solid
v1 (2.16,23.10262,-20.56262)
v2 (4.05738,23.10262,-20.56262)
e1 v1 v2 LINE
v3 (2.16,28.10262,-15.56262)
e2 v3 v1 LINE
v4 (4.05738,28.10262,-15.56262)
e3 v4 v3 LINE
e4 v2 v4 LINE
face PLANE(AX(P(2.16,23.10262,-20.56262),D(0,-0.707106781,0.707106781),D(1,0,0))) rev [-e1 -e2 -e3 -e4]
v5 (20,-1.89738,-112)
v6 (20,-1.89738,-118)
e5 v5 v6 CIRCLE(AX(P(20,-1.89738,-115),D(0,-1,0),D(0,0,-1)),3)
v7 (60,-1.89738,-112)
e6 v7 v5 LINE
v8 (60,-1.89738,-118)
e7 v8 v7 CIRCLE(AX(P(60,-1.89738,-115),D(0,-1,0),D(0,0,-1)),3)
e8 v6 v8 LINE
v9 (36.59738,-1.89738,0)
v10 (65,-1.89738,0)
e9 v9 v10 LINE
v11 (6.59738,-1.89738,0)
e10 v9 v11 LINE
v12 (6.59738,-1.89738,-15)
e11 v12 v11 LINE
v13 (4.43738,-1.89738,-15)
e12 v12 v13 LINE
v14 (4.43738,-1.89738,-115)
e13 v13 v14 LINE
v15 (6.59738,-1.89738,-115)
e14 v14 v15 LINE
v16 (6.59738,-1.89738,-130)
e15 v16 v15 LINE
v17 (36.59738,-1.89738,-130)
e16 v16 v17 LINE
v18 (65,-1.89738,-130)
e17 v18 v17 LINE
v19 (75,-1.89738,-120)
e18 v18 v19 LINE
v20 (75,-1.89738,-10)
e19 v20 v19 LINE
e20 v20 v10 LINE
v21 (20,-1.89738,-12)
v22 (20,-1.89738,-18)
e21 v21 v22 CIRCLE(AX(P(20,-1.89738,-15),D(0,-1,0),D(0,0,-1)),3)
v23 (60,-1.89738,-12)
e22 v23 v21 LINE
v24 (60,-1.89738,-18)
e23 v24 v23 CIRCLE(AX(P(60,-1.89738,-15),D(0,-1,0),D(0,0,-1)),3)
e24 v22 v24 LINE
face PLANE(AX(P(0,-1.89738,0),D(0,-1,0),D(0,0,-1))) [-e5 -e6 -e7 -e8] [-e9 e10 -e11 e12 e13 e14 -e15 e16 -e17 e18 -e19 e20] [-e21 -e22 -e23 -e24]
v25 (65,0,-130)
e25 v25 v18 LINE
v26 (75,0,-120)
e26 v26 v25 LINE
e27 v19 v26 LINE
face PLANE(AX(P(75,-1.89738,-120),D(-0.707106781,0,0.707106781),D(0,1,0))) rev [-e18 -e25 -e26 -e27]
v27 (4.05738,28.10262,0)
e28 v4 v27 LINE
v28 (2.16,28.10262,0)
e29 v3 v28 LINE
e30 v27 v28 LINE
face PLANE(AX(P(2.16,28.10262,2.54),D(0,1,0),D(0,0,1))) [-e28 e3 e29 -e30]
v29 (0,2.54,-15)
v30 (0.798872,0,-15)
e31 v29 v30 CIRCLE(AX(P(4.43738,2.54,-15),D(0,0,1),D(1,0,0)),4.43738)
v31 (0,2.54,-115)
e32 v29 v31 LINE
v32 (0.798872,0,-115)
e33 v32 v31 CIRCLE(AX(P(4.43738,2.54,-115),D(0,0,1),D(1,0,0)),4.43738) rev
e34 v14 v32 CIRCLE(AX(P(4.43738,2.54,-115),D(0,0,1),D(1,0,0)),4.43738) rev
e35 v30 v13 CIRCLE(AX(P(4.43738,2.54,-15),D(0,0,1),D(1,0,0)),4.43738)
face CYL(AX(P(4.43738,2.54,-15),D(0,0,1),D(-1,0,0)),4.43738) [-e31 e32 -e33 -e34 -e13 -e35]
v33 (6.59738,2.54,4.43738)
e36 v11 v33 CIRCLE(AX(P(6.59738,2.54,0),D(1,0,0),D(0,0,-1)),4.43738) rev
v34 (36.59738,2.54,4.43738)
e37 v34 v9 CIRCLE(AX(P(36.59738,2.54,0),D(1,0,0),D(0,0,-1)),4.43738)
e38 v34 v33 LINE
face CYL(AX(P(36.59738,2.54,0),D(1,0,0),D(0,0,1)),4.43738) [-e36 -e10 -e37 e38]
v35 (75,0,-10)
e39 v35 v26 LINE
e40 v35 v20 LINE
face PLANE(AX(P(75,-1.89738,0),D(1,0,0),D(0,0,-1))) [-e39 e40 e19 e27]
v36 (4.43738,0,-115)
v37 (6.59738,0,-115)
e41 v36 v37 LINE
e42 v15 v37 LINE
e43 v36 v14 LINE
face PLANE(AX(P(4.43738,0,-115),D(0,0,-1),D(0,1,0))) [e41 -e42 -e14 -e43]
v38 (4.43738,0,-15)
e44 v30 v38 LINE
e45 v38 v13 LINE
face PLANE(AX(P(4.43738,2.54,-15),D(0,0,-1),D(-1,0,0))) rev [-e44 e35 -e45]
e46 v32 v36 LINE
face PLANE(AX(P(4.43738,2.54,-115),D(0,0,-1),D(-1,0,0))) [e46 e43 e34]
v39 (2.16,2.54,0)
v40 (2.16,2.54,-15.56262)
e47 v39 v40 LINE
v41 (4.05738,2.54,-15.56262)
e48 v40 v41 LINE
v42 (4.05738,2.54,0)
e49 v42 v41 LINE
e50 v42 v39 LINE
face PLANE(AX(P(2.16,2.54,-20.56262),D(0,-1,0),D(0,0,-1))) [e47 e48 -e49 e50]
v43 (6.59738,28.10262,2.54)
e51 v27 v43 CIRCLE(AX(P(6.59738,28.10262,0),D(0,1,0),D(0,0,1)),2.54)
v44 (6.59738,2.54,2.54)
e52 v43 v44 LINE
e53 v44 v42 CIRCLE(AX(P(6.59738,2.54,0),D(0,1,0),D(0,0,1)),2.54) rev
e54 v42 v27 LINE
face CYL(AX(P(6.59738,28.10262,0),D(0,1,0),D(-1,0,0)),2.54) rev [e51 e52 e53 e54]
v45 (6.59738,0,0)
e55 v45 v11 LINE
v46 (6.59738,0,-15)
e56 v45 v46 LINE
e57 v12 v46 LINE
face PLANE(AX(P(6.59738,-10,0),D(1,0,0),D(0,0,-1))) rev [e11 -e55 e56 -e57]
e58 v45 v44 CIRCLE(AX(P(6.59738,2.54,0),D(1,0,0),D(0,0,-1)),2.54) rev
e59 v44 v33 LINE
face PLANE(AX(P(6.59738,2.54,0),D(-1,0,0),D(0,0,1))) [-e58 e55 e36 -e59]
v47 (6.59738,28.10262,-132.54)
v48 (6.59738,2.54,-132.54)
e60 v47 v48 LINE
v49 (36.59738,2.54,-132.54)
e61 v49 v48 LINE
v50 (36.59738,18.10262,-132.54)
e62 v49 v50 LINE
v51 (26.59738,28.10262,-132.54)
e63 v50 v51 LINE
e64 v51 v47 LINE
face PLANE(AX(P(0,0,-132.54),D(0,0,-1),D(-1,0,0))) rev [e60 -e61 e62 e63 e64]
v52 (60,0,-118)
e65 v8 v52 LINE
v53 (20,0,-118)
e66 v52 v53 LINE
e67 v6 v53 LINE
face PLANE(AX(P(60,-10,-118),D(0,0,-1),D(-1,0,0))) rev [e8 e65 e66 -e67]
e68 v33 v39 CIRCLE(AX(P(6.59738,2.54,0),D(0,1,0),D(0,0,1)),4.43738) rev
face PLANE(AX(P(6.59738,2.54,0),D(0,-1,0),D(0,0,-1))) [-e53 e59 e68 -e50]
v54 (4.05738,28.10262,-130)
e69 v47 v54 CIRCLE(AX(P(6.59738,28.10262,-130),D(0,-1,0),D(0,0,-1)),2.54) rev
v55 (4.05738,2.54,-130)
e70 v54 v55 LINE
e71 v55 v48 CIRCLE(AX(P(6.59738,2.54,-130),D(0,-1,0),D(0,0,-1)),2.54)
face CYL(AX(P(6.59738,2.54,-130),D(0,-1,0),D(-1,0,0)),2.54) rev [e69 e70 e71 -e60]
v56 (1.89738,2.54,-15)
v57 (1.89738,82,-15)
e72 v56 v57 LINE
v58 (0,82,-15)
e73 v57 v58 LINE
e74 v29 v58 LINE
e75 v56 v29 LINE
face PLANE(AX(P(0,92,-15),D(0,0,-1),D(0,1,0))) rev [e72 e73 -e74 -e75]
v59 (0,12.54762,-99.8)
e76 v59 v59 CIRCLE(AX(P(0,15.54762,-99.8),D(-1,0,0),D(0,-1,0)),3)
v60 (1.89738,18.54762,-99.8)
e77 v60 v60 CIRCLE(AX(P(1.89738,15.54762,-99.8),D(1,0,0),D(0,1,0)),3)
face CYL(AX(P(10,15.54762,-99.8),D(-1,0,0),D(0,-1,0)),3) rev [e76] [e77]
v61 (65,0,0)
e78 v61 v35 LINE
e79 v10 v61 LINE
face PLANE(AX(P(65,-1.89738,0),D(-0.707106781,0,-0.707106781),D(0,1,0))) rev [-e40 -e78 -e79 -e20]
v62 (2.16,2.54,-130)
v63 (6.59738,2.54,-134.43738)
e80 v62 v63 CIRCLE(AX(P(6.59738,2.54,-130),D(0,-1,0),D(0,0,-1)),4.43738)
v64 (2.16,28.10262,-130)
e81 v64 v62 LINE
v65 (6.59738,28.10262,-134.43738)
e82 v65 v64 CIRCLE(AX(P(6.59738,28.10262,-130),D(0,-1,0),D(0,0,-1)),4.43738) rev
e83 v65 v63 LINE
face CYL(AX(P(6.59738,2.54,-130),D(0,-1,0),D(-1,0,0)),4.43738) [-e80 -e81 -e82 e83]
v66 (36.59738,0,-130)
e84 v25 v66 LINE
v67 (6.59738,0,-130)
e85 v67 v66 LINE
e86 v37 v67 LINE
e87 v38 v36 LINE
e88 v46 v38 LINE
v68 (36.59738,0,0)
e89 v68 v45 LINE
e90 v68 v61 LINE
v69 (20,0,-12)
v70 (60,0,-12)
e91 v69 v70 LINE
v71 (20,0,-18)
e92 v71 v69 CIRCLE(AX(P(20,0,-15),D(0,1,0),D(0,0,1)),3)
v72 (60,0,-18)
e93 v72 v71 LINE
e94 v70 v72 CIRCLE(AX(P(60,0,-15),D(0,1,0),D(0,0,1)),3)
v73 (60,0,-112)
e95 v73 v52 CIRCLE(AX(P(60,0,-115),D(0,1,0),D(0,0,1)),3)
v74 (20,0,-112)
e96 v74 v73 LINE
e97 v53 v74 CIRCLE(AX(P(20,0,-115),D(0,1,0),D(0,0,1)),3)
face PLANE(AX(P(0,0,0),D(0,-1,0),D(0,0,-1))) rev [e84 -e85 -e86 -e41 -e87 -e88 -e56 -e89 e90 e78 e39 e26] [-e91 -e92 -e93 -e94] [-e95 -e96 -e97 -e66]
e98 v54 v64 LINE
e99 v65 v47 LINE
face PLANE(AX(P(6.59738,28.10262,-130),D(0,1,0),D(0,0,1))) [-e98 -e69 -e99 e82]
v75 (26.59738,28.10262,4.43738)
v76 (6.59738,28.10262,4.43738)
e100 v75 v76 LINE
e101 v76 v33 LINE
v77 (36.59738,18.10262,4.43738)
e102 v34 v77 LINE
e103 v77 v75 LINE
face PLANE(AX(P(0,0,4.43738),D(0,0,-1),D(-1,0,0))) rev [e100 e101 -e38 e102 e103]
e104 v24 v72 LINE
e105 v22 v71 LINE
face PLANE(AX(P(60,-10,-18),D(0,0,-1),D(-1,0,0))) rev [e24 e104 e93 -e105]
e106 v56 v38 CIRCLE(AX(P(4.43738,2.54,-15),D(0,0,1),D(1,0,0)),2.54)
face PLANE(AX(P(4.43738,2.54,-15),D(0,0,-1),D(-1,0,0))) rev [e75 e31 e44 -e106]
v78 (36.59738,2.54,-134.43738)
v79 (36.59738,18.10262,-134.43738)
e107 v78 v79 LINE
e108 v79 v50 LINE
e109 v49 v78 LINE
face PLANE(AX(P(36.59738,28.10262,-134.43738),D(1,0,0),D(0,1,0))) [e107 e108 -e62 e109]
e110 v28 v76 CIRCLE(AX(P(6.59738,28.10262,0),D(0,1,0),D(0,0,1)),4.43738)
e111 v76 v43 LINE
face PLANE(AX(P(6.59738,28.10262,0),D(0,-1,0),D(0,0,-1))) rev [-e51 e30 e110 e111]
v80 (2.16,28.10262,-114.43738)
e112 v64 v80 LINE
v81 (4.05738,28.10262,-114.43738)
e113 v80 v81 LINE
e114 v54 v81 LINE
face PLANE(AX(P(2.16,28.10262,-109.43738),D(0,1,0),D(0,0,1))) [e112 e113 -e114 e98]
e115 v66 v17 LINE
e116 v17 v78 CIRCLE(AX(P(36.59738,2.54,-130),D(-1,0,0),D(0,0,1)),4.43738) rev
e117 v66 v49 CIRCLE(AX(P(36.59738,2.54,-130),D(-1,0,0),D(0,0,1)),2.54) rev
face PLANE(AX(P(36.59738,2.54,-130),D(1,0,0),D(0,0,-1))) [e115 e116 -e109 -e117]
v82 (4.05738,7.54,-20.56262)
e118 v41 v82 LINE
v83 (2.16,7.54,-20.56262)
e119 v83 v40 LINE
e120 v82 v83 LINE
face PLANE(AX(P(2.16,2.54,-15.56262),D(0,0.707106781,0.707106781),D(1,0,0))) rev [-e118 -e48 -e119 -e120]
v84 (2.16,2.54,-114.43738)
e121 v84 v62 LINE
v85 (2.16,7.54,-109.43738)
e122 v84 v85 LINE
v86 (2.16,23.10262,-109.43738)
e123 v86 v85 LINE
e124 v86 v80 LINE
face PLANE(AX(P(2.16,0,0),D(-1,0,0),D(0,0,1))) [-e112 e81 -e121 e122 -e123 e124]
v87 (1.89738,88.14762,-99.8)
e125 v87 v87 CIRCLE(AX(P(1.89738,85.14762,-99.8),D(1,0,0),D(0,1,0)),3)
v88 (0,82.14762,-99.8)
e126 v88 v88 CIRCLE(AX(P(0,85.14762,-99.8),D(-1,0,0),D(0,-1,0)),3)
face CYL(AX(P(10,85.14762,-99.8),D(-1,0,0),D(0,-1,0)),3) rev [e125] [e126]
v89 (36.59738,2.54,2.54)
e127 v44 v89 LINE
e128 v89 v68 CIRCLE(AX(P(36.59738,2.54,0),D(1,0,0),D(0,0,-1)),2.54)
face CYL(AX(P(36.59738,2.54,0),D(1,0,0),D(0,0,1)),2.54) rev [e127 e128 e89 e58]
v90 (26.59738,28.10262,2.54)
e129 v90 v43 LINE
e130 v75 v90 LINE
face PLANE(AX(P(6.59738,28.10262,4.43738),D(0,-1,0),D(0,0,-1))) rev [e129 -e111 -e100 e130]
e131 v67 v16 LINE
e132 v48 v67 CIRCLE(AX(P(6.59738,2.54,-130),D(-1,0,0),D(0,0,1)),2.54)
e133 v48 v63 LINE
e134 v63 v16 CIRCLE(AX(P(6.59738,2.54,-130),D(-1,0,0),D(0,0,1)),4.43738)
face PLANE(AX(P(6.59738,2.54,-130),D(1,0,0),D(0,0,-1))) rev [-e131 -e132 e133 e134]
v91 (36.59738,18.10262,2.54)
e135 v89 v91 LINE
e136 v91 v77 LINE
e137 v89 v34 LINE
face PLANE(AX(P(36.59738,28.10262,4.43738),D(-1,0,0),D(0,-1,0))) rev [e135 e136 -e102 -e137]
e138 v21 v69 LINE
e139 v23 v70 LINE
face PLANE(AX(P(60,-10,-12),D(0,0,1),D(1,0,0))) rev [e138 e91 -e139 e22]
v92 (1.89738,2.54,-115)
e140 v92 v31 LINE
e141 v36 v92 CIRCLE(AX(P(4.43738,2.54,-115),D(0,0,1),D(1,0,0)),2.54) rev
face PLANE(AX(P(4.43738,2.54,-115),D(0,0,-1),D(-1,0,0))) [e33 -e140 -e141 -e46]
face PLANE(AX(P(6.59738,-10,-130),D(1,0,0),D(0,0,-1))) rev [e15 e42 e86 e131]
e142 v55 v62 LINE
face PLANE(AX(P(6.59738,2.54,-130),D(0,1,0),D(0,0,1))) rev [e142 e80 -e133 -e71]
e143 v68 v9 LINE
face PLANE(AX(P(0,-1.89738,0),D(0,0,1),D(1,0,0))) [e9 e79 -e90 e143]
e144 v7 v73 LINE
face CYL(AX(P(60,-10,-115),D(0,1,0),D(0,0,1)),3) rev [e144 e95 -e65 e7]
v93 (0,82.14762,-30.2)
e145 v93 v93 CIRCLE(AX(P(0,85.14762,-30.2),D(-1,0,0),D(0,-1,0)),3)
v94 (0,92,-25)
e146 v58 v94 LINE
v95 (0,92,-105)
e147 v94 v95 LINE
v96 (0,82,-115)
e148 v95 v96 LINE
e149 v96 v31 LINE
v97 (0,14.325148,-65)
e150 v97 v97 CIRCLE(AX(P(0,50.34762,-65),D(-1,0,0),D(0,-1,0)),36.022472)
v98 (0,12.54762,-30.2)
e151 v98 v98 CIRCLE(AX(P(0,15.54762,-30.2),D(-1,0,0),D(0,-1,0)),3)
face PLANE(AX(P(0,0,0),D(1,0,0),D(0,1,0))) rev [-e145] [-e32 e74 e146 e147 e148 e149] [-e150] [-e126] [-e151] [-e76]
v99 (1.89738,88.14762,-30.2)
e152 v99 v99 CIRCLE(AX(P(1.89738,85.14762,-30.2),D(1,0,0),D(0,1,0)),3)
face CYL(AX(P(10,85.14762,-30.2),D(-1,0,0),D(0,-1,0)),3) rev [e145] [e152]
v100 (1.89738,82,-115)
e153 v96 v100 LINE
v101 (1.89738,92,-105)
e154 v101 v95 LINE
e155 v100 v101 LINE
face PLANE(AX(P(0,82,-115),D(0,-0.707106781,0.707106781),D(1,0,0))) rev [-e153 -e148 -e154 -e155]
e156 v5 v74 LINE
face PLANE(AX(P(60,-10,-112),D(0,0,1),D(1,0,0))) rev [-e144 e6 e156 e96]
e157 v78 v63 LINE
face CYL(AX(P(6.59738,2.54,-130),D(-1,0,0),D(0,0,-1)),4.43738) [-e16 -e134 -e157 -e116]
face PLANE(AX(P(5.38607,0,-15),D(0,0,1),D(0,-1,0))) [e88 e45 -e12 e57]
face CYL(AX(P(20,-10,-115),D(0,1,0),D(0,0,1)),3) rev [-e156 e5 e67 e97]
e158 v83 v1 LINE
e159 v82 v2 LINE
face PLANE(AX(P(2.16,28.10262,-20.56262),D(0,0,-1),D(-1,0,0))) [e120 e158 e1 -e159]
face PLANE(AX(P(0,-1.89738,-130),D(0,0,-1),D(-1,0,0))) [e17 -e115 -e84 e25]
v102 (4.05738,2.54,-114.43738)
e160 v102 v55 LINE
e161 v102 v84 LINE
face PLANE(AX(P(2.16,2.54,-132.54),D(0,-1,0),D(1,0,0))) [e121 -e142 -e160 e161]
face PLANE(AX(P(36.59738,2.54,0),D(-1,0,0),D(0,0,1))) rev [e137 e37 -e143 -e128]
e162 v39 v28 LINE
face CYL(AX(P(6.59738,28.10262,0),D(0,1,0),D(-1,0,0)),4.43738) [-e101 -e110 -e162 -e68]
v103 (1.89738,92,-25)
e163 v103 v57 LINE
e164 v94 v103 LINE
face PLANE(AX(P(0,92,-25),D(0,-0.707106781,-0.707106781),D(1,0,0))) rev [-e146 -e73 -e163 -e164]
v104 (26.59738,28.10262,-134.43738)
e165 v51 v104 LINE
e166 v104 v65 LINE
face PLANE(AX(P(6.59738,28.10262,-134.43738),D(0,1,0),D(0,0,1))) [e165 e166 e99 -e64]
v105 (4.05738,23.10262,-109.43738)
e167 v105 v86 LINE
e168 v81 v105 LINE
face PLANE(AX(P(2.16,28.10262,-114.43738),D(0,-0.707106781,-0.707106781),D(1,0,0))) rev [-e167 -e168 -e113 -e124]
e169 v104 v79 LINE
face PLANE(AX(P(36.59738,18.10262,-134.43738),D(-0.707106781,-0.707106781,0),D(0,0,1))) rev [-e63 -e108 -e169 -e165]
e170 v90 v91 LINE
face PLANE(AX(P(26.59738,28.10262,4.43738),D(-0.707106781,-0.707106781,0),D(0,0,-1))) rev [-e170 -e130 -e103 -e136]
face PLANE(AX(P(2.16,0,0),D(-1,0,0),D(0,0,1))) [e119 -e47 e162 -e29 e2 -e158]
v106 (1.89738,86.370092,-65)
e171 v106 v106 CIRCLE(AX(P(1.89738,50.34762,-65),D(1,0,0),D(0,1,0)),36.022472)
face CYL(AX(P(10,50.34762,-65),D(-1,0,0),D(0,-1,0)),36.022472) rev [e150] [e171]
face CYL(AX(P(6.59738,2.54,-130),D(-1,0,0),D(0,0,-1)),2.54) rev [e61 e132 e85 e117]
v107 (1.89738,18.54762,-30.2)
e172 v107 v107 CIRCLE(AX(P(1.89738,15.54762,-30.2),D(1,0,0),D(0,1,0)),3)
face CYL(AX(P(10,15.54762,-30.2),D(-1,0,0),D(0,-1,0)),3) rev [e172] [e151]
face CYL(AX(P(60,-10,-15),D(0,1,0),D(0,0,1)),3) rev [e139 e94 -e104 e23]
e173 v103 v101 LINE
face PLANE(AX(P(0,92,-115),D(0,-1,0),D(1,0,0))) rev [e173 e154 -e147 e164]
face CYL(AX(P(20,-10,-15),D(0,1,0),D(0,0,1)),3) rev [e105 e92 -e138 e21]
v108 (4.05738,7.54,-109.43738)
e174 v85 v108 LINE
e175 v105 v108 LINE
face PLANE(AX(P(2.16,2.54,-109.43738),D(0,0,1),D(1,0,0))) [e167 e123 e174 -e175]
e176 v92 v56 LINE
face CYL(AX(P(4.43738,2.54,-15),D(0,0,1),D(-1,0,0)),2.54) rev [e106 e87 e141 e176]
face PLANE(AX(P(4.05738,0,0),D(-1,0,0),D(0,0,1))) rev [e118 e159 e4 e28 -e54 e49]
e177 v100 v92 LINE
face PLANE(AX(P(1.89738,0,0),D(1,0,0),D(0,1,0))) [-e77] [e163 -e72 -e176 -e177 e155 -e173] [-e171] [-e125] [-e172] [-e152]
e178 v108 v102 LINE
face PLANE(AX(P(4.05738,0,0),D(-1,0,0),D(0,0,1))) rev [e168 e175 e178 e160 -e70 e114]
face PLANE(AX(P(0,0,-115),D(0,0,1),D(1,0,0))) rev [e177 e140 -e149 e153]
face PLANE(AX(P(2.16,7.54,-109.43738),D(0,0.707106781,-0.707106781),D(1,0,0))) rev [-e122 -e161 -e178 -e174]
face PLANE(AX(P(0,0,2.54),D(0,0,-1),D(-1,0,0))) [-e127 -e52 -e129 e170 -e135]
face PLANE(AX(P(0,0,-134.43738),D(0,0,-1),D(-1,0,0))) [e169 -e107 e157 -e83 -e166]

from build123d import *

# Parameters (mm, degrees)
SKETCH1_W                     = 75
SKETCH1_H                     = 130
BASE_FLANGE1_DEPTH            = 1.89738
EDGE_FLANGE1_STRIP_W          = 12.66952
EDGE_FLANGE1_STRIP_H          = 1.89738
EDGE_FLANGE1_STRIP_CUT_DEPTH  = 100
EDGE_FLANGE1_RELIEF_W         = 13.61821
EDGE_FLANGE1_RELIEF_H         = 0.94869
EDGE_FLANGE1_RELIEF_CUT_DEPTH = 1.89738
EDGE_FLANGE1_DEPTH            = 100
SKETCH18_R                    = 3
SKETCH18_R_2                  = 36.022471604
CUT_EXTRUDE1_DEPTH            = 10
BREAK_CORNER1_DEPTH           = 1.89738
BREAK_CORNER2_START           = -1.89738
BREAK_CORNER2_DEPTH           = 1.89738
CUT_EXTRUDE2_DEPTH            = 10
EDGE_FLANGE2_DEPTH            = 30
EDGE_FLANGE3_DEPTH            = 25.56262
EDGE_FLANGE4_DEPTH            = 30
EDGE_FLANGE5_DEPTH            = 25.56262
BREAK_CORNER3_START           = 38.678740931
BREAK_CORNER3_OUTLINE_W       = 18
BREAK_CORNER3_OUTLINE_H       = 1.89738
BREAK_CORNER3_DEPTH           = 7.071067812
BREAK_CORNER4_START           = 2.16
BREAK_CORNER4_DEPTH           = 1.89738
SKETCH32_W                    = 6.59738
SKETCH32_H                    = 15
CUT_EXTRUDE3_DEPTH            = 10


# Read off the part's stored shape, not the designer's step: Break-Corner1, Break-Corner2, Break-Corner3, Break-Corner4
# Sheet-metal steps are written as plain solids
with BuildPart() as part:
    # Sketch1 → Base-Flange1 (new body)
    with BuildSketch(Plane(origin=(0, 0, 0), x_dir=(1, 0, 0), z_dir=(0, 1, 0))):
        with Locations((37.5, 65)):
            Rectangle(SKETCH1_W, SKETCH1_H)
    extrude(amount=-BASE_FLANGE1_DEPTH)

    # Edge-Flange1 strip (across the edge) → Edge-Flange1 strip cut (cut)
    with BuildSketch(Plane.XY.offset(-115)):
        with Locations((-1.89738, -0.94869)):
            Rectangle(EDGE_FLANGE1_STRIP_W, EDGE_FLANGE1_STRIP_H)
    extrude(amount=EDGE_FLANGE1_STRIP_CUT_DEPTH, mode=Mode.SUBTRACT)

    # Edge-Flange1 relief (on the sheet) → Edge-Flange1 relief cut (cut)
    with BuildSketch(Plane(origin=(4.43738, 0, -115), x_dir=(1, 0, 0), z_dir=(0, 1, 0))):
        with Locations((-5.860415, 0.474345)):
            Rectangle(EDGE_FLANGE1_RELIEF_W, EDGE_FLANGE1_RELIEF_H)
        with Locations((-5.860415, -100.474345)):
            Rectangle(EDGE_FLANGE1_RELIEF_W, EDGE_FLANGE1_RELIEF_H)
    extrude(amount=-EDGE_FLANGE1_RELIEF_CUT_DEPTH, mode=Mode.SUBTRACT)

    # Edge-Flange1 section (across the edge) → Edge-Flange1 (add)
    with BuildSketch(Plane.XY.offset(-115)):
        with BuildLine():
            Line((0, 2.54), (0, 92))
            Line((0, 92), (1.89738, 92))
            Line((1.89738, 92), (1.89738, 2.54))
            ThreePointArc((1.89738, 2.54), (2.641328776, 0.743948776), (4.43738, 0))
            Line((4.43738, 0), (4.43738, -1.89738))
            ThreePointArc((4.43738, -1.89738), (1.299678511, -0.597701489), (0, 2.54))
        make_face()
    extrude(amount=EDGE_FLANGE1_DEPTH)

    # Sketch18 → Cut-Extrude1 (cut)
    with BuildSketch(Plane.ZY):
        with Locations(Location((-99.8, 85.14762, 0), (0, 0, 270))):
            Circle(SKETCH18_R)
        with Locations(Location((-30.2, 85.14762, 0), (0, 0, 270))):
            Circle(SKETCH18_R)
        with Locations(Location((-30.2, 15.54762, 0), (0, 0, 270))):
            Circle(SKETCH18_R)
        with Locations(Location((-99.8, 15.54762, 0), (0, 0, 270))):
            Circle(SKETCH18_R)
        with Locations(Location((-65, 50.34762, 0), (0, 0, 270))):
            Circle(SKETCH18_R_2)
    extrude(amount=-CUT_EXTRUDE1_DEPTH, mode=Mode.SUBTRACT)

    # Break-Corner1 outline → Break-Corner1 (cut)
    with BuildSketch(Plane.YZ):
        Polygon((92, -15), (82, -15), (92, -25), align=None)
        Polygon((92, -115), (92, -105), (82, -115), align=None)
    extrude(amount=BREAK_CORNER1_DEPTH, mode=Mode.SUBTRACT)

    # Break-Corner2 outline → Break-Corner2 (cut)
    with BuildSketch(Plane(origin=(0, 0, 0), x_dir=(1, 0, 0), z_dir=(0, 1, 0)).offset(BREAK_CORNER2_START)):
        Polygon((75, 130), (65, 130), (75, 120), align=None)
        Polygon((75, 0), (75, 10), (65, 0), align=None)
    extrude(amount=BREAK_CORNER2_DEPTH, mode=Mode.SUBTRACT)

    # Sketch19 → Cut-Extrude2 (cut)
    with BuildSketch(Plane(origin=(0, 0, 0), x_dir=(1, 0, 0), z_dir=(0, 1, 0))):
        with BuildLine():
            Line((60, 112), (20, 112))
            ThreePointArc((20, 112), (17, 115), (20, 118))
            Line((20, 118), (60, 118))
            ThreePointArc((60, 118), (63, 115), (60, 112))
        make_face()
        with BuildLine():
            Line((60, 12), (20, 12))
            ThreePointArc((20, 12), (17, 15), (20, 18))
            Line((20, 18), (60, 18))
            ThreePointArc((60, 18), (63, 15), (60, 12))
        make_face()
    extrude(amount=-CUT_EXTRUDE2_DEPTH, mode=Mode.SUBTRACT)

    # Edge-Flange2 section (across the edge) → Edge-Flange2 (add)
    with BuildSketch(Plane(origin=(6.59738, 0, 2.54), x_dir=(0, 0, -1), z_dir=(1, 0, 0))):
        with BuildLine():
            Line((-1.89738, 2.54), (-1.89738, 28.10262))
            Line((-1.89738, 28.10262), (0, 28.10262))
            Line((0, 28.10262), (0, 2.54))
            ThreePointArc((0, 2.54), (0.743948776, 0.743948776), (2.54, 0))
            Line((2.54, 0), (2.54, -1.89738))
            ThreePointArc((2.54, -1.89738), (-0.597701489, -0.597701489), (-1.89738, 2.54))
        make_face()
    extrude(amount=EDGE_FLANGE2_DEPTH)

    # Edge-Flange3 section (across the edge) → Edge-Flange3 (add)
    with BuildSketch(Plane(origin=(4.05738, 2.54, 2.54), x_dir=(1, 0, 0), z_dir=(0, 1, 0))):
        with BuildLine():
            Line((-1.89738, 2.54), (-1.89738, 23.10262))
            Line((-1.89738, 23.10262), (0, 23.10262))
            Line((0, 23.10262), (0, 2.54))
            ThreePointArc((0, 2.54), (0.743948776, 0.743948776), (2.54, 0))
            Line((2.54, 0), (2.54, -1.89738))
            ThreePointArc((2.54, -1.89738), (-0.597701489, -0.597701489), (-1.89738, 2.54))
        make_face()
    extrude(amount=EDGE_FLANGE3_DEPTH)

    # Edge-Flange4 section (across the edge) → Edge-Flange4 (add)
    with BuildSketch(Plane(origin=(36.59738, 0, -132.54), x_dir=(0, 0, 1), z_dir=(-1, 0, 0))):
        with BuildLine():
            Line((-1.89738, 2.54), (-1.89738, 28.10262))
            Line((-1.89738, 28.10262), (0, 28.10262))
            Line((0, 28.10262), (0, 2.54))
            ThreePointArc((0, 2.54), (0.743948776, 0.743948776), (2.54, 0))
            Line((2.54, 0), (2.54, -1.89738))
            ThreePointArc((2.54, -1.89738), (-0.597701489, -0.597701489), (-1.89738, 2.54))
        make_face()
    extrude(amount=EDGE_FLANGE4_DEPTH)

    # Edge-Flange5 section (across the edge) → Edge-Flange5 (add)
    with BuildSketch(Plane(origin=(4.05738, 28.10262, -132.54), x_dir=(1, 0, 0), z_dir=(0, -1, 0))):
        with BuildLine():
            Line((-1.89738, 2.54), (-1.89738, 23.10262))
            Line((-1.89738, 23.10262), (0, 23.10262))
            Line((0, 23.10262), (0, 2.54))
            ThreePointArc((0, 2.54), (0.743948776, 0.743948776), (2.54, 0))
            Line((2.54, 0), (2.54, -1.89738))
            ThreePointArc((2.54, -1.89738), (-0.597701489, -0.597701489), (-1.89738, 2.54))
        make_face()
    extrude(amount=EDGE_FLANGE5_DEPTH)

    # Break-Corner3 outline → Break-Corner3 (cut)
    with BuildSketch(Plane(origin=(0, 0, 0), x_dir=(0.707106781186548, -0.707106781186547, 0), z_dir=(0.707106781186547, 0.707106781186548, 0)).offset(BREAK_CORNER3_START)):
        with Locations((6, -3.48869)):
            Rectangle(BREAK_CORNER3_OUTLINE_W, BREAK_CORNER3_OUTLINE_H)
        with Locations((6, 133.48869)):
            Rectangle(BREAK_CORNER3_OUTLINE_W, BREAK_CORNER3_OUTLINE_H)
    extrude(amount=BREAK_CORNER3_DEPTH, mode=Mode.SUBTRACT)

    # Break-Corner4 outline → Break-Corner4 (cut)
    with BuildSketch(Plane.YZ.offset(BREAK_CORNER4_START)):
        Polygon((2.54, -20.56262), (7.54, -20.56262), (2.54, -15.56262), align=None)
        Polygon((28.10262, -15.56262), (23.10262, -20.56262), (28.10262, -20.56262), align=None)
        Polygon((28.10262, -109.43738), (23.10262, -109.43738), (28.10262, -114.43738), align=None)
        Polygon((2.54, -114.43738), (7.54, -109.43738), (2.54, -109.43738), align=None)
    extrude(amount=BREAK_CORNER4_DEPTH, mode=Mode.SUBTRACT)

    # Sketch32 → Cut-Extrude3 (cut)
    with BuildSketch(Plane(origin=(0, 0, 0), x_dir=(1, 0, 0), z_dir=(0, 1, 0))):
        with Locations((3.29869, 122.5)):
            Rectangle(SKETCH32_W, SKETCH32_H)
        with Locations((3.29869, 7.5)):
            Rectangle(SKETCH32_W, SKETCH32_H)
    extrude(amount=-CUT_EXTRUDE3_DEPTH, mode=Mode.SUBTRACT)


solid = part.part
